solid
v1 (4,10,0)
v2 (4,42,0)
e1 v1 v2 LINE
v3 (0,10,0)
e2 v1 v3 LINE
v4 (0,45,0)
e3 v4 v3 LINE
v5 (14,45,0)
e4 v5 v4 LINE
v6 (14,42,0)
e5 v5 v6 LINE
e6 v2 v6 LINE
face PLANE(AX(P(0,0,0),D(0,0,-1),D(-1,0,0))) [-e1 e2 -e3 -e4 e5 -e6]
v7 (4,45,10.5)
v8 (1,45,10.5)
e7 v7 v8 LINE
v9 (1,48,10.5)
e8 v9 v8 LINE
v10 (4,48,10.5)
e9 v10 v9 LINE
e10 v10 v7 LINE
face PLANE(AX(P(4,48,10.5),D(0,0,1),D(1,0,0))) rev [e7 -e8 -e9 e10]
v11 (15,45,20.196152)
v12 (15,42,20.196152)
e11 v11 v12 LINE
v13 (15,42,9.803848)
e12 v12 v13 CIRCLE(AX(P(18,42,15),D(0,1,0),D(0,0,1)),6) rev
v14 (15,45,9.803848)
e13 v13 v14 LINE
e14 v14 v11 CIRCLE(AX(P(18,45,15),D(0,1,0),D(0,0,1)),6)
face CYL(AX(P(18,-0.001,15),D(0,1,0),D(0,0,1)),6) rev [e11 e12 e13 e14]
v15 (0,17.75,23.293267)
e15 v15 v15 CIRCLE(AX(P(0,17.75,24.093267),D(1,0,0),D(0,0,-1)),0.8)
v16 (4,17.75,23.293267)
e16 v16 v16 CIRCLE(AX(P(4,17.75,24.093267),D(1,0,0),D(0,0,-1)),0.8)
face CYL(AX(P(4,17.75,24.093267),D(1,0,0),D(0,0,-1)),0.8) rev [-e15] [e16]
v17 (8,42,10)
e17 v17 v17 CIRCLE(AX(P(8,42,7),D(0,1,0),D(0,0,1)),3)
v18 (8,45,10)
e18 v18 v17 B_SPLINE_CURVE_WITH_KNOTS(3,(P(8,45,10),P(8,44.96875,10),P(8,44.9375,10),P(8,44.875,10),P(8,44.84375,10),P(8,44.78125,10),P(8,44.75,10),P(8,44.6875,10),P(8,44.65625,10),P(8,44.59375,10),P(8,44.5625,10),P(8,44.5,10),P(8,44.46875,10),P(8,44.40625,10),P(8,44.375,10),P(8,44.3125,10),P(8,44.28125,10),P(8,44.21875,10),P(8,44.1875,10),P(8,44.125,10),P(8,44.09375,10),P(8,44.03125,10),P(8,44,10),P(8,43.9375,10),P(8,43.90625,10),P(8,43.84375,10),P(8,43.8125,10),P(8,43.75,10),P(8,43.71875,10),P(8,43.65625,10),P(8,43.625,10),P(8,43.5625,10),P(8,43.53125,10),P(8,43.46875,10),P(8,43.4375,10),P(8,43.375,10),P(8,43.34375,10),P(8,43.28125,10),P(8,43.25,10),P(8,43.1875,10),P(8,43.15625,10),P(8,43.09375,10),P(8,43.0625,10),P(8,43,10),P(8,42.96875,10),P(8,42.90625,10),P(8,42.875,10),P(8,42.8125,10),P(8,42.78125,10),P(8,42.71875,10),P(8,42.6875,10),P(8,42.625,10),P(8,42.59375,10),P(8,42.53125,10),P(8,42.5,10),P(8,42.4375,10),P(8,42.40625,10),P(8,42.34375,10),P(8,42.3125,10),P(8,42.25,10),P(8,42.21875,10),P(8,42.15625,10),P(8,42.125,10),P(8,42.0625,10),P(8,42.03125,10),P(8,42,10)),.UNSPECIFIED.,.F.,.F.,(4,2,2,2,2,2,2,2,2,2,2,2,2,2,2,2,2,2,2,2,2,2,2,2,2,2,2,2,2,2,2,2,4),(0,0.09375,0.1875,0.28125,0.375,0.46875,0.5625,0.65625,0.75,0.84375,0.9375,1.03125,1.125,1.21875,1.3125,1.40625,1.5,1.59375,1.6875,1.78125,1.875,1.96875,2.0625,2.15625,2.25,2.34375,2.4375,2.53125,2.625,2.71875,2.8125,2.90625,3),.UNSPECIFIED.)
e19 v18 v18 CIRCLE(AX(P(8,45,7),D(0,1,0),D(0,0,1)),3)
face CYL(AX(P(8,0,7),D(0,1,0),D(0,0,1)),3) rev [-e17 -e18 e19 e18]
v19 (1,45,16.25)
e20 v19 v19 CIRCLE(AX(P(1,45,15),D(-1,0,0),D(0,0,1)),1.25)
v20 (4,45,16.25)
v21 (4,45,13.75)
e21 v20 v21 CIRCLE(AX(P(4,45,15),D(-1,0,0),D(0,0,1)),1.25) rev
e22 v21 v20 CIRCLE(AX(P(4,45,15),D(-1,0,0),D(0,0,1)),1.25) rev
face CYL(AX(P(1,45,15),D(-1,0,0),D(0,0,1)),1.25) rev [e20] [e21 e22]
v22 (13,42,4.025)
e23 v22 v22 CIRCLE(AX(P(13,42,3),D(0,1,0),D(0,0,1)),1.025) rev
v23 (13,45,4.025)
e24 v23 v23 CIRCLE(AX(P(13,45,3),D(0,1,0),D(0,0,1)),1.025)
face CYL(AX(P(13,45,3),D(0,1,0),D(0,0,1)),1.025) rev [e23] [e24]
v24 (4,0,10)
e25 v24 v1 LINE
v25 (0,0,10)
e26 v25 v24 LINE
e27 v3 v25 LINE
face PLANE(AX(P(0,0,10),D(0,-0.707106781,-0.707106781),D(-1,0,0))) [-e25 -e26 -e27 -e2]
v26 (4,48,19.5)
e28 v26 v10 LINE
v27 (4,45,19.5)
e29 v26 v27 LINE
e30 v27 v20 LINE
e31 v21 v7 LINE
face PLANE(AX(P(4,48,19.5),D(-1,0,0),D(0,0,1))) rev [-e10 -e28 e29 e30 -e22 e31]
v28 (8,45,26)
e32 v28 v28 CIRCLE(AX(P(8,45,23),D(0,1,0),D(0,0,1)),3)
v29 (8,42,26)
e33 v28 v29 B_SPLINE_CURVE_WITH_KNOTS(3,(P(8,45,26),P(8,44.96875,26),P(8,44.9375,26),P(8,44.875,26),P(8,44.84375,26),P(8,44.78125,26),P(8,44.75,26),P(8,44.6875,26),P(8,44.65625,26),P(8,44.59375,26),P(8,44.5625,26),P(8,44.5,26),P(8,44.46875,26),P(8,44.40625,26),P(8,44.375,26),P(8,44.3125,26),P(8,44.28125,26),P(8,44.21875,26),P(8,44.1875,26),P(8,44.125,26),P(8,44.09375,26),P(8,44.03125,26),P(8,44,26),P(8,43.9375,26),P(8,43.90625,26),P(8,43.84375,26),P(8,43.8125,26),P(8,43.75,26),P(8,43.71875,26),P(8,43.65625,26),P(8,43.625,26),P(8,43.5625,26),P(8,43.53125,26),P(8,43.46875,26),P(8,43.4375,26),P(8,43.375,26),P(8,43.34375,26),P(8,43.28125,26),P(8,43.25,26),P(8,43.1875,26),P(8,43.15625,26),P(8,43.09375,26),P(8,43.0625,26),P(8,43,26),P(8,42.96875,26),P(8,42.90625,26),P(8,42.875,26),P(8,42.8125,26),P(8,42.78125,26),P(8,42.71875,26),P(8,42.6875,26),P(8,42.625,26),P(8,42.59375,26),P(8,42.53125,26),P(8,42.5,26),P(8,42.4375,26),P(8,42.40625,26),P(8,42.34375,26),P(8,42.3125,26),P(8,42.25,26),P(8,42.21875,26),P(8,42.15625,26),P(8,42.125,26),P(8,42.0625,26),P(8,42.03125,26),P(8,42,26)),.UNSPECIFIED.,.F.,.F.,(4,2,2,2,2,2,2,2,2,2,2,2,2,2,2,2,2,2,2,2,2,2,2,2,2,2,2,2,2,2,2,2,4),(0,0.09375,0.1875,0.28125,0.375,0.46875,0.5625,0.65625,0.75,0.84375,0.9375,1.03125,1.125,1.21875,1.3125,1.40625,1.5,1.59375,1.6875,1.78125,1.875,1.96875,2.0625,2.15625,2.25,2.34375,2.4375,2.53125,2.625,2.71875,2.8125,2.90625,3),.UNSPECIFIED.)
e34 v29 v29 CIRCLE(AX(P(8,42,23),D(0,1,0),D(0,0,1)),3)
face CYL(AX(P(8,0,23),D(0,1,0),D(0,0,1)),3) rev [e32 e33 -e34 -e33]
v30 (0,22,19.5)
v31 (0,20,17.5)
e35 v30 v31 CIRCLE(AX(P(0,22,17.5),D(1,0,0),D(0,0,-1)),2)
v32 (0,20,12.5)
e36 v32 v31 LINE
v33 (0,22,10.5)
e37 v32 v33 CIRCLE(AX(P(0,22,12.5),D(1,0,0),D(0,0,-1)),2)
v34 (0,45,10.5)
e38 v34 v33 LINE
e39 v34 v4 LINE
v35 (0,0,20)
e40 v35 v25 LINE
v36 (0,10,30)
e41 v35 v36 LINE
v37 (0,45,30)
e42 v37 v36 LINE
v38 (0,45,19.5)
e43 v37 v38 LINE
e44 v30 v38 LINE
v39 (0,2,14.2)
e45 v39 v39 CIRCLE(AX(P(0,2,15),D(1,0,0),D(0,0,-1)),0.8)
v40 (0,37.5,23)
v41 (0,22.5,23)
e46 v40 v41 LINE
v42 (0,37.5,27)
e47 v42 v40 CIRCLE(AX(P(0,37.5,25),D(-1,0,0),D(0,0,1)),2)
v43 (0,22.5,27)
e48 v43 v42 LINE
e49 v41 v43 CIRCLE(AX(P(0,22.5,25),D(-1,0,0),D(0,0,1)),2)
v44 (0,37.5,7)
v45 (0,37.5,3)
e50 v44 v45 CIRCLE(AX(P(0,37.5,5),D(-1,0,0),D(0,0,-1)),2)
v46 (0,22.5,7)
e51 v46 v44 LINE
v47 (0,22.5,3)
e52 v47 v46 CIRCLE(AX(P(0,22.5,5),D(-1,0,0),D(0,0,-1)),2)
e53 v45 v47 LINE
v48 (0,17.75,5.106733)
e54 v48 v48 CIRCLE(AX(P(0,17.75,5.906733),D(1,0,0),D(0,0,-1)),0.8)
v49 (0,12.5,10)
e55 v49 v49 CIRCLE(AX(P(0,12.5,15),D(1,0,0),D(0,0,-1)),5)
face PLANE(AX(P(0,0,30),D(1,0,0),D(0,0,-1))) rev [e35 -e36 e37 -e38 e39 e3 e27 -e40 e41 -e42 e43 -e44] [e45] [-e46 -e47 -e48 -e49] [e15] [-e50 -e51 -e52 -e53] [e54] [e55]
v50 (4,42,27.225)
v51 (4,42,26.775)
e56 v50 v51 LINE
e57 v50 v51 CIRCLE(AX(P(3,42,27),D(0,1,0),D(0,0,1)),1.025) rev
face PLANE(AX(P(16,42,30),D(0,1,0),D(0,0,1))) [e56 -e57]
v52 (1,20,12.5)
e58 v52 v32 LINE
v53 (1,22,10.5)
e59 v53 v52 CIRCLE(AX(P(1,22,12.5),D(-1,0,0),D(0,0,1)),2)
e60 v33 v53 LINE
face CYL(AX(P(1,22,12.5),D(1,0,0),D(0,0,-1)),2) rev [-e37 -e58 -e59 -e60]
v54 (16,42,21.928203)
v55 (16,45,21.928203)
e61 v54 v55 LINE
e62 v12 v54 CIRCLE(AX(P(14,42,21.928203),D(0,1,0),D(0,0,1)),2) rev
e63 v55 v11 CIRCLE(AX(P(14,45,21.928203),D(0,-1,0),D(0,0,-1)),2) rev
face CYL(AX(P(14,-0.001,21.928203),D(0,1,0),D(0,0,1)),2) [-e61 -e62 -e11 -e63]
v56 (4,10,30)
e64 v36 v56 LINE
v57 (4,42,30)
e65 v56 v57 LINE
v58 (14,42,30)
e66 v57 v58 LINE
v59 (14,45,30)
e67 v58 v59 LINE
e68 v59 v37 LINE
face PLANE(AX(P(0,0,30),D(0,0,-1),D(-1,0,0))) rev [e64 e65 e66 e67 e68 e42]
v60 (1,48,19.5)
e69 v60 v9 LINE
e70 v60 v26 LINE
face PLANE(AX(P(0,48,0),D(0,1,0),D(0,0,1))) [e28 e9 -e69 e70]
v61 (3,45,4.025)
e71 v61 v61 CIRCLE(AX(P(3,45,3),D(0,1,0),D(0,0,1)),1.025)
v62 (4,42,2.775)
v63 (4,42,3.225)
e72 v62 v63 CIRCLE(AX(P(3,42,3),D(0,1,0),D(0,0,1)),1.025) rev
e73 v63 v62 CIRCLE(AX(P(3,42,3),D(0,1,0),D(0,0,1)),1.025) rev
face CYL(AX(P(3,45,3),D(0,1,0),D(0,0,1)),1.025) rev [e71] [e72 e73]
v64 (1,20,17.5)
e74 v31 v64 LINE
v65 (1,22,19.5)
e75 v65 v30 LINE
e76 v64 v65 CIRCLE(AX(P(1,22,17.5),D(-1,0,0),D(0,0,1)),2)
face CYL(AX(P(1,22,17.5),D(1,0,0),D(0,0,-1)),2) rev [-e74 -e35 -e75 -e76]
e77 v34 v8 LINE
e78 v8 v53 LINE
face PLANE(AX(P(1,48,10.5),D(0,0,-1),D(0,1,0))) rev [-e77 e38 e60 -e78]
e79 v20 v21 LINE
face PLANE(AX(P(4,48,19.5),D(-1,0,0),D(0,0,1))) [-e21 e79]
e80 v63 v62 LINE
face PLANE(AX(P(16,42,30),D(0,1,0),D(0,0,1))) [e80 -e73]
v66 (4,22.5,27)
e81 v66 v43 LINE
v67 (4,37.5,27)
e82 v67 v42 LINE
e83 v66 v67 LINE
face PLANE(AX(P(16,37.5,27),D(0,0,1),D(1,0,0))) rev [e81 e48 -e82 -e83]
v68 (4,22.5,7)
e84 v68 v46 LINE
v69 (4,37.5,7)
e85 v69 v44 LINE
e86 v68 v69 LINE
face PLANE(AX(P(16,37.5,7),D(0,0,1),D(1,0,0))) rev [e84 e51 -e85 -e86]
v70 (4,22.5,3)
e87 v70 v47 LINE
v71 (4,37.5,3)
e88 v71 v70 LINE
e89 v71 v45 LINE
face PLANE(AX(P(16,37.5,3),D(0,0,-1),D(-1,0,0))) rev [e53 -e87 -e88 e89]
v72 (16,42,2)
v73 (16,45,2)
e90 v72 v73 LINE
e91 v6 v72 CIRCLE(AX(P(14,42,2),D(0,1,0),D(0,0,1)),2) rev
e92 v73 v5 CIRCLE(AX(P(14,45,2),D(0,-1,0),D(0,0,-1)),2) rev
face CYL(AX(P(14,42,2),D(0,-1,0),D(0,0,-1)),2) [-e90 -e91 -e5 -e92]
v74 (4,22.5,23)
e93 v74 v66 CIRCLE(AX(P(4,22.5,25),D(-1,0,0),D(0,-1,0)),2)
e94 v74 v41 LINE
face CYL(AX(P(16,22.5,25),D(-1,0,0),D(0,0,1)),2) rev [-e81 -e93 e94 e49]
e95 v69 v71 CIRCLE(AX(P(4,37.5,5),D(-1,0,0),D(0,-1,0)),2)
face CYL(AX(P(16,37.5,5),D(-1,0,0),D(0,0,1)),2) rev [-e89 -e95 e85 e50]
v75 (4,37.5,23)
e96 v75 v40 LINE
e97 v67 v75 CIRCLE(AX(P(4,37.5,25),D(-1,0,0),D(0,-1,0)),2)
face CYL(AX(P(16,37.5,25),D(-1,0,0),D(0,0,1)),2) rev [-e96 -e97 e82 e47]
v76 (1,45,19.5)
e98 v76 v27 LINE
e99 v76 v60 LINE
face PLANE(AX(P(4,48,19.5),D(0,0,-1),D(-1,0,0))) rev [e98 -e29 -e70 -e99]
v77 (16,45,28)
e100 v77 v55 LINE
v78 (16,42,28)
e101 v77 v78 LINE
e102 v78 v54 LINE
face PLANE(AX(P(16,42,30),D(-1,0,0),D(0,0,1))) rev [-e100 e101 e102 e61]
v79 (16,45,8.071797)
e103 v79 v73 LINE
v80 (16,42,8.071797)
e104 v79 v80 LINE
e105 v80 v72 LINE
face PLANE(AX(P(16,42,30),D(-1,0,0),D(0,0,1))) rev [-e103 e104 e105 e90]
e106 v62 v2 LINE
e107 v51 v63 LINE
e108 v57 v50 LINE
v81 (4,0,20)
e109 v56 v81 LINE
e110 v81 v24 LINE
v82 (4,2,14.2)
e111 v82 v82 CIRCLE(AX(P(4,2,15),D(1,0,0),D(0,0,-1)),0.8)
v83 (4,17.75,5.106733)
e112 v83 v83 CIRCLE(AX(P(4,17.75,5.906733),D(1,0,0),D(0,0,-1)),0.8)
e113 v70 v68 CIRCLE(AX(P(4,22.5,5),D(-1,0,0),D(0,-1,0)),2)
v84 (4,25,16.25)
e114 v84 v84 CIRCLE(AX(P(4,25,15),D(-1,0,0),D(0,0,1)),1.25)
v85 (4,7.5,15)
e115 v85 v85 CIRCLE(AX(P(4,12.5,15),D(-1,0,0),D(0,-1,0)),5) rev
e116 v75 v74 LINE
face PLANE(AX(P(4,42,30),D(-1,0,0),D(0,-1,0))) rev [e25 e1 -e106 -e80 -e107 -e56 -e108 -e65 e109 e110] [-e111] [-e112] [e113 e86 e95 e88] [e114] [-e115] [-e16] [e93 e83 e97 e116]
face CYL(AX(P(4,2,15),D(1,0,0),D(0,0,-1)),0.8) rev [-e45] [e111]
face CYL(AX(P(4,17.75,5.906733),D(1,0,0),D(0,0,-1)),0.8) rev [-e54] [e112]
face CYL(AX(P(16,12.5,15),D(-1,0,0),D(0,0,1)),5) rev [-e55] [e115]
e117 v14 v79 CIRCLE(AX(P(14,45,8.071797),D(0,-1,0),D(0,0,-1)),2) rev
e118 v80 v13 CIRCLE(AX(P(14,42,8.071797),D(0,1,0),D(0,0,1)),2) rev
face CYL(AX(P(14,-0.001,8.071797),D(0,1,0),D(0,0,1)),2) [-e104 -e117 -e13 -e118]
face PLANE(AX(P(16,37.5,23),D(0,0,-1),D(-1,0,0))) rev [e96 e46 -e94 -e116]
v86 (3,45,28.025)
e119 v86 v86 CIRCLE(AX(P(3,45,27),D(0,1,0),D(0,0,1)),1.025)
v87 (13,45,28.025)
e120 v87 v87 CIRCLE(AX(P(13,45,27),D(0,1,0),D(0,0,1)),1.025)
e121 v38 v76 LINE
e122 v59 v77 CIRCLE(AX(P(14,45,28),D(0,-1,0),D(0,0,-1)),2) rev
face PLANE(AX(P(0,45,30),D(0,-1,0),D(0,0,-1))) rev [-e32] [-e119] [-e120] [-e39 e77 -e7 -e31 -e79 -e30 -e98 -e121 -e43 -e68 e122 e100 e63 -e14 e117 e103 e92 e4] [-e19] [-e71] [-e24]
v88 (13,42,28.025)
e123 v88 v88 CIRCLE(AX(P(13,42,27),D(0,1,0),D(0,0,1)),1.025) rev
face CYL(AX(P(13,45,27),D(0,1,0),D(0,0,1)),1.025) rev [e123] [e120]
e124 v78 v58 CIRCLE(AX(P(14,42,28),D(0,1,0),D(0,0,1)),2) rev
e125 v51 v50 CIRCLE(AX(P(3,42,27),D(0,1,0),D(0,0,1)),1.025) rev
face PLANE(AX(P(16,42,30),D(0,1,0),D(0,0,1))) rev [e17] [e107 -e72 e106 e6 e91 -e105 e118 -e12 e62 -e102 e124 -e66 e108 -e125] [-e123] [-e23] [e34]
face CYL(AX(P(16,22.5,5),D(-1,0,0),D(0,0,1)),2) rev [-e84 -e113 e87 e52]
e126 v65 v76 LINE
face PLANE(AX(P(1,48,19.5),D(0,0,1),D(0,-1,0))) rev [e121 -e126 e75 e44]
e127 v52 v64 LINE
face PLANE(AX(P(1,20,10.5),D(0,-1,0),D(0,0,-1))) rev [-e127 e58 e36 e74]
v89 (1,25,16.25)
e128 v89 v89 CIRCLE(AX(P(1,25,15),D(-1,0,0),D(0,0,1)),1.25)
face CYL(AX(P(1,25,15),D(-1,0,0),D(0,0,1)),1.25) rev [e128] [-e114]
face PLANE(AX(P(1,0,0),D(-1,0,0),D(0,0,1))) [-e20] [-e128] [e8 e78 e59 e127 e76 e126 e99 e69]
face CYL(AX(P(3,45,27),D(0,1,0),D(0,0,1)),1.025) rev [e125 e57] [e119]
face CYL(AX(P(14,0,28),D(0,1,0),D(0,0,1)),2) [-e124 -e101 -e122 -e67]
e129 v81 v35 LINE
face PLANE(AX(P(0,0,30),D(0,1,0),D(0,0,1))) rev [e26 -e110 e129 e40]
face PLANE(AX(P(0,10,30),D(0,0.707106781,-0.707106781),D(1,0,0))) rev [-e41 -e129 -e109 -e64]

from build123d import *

# Parameters (mm, degrees)
EXTRUDE_1_DEPTH              = 30
SKETCH_3_R                   = 5
CUT_EXTRUDE_1_DEPTH          = 57.400354609
SKETCH_6_R                   = 3
CUT_EXTRUDE_3_DEPTH          = 57.400354609
SKETCH_9_W                   = 4
SKETCH_9_H                   = 9
EXTRUDE_3_DEPTH              = 3
SKETCH_10_W                  = 9
SKETCH_10_H                  = 28
CUT_EXTRUDE_4_DEPTH          = 1
HOLE_START                   = 1
HOLE_WIZARD_M3_1_OUTLINE_R   = 1.25
HOLE_WIZARD_M3_1_DEPTH       = 3
CUT_EXTRUDE_5_DEPTH          = 59.821764679
CHAMFER_1_SIZE               = 10
HOLE_START_2                 = 42
HOLE_WIZARD_M2_5_3_OUTLINE_R = 1.025
HOLE_WIZARD_M2_5_3_DEPTH     = 3
CUT_EXTRUDE_6_REACH          = 58.4
SKETCH_18_R                  = 6
FILLET_2_R                   = 2
FILLET_3_R                   = 2
HOLE_WIZARD_M2_1_D           = 1.6


# Read off the part's stored shape, not the designer's step: M3 螺纹孔1, M2.5 螺纹孔3
with BuildPart() as part:
    # 草图2 → 凸台-拉伸1 (new body)
    with BuildSketch(Plane.XY):
        Polygon((16, 42), (4, 42), (4, 0), (0, 0), (0, 45), (16, 45), align=None)
    extrude(amount=EXTRUDE_1_DEPTH)

    # 草图3 → 切除-拉伸1 (cut, through all)
    with BuildSketch(Plane(origin=(0, 0, 30), x_dir=(0, 0, -1), z_dir=(1, 0, 0))):
        with Locations(Location((15, 12.5, 0), (0, 0, 270))):
            Circle(SKETCH_3_R)
    extrude(amount=CUT_EXTRUDE_1_DEPTH, mode=Mode.SUBTRACT)

    # 草图6 → 切除-拉伸3 (cut, through all)
    with BuildSketch(Plane(origin=(0, 45, 0), x_dir=(1, 0, 0), z_dir=(0, 1, 0))):
        with Locations(Location((8, -23, 0), (0, 0, 270))):
            Circle(SKETCH_6_R)
        with Locations(Location((8, -7, 0), (0, 0, 270))):
            Circle(SKETCH_6_R)
    extrude(amount=-CUT_EXTRUDE_3_DEPTH, mode=Mode.SUBTRACT)

    # 草图9 → 凸台-拉伸3 (add)
    with BuildSketch(Plane(origin=(0, 45, 0), x_dir=(1, 0, 0), z_dir=(0, 1, 0))):
        with Locations((2, -15)):
            Rectangle(SKETCH_9_W, SKETCH_9_H)
    extrude(amount=EXTRUDE_3_DEPTH)

    # 草图10 → 切除-拉伸4 (cut)
    with BuildSketch(Plane.ZY):
        with Locations((15, 34)):
            Rectangle(SKETCH_10_W, SKETCH_10_H)
    extrude(amount=-CUT_EXTRUDE_4_DEPTH, mode=Mode.SUBTRACT)

    # M3 螺纹孔1 outline → M3 螺纹孔1 (cut)
    with BuildSketch(Plane.YZ.offset(HOLE_START)):
        with Locations((25, 15)):
            Circle(HOLE_WIZARD_M3_1_OUTLINE_R)
        with Locations((45, 15)):
            Circle(HOLE_WIZARD_M3_1_OUTLINE_R)
    extrude(amount=HOLE_WIZARD_M3_1_DEPTH, mode=Mode.SUBTRACT)

    # 草图13 → 切除-拉伸5 (cut, through all)
    with BuildSketch(Plane.ZY):
        with BuildLine():
            Line((27, 37.5), (27, 22.5))
            ThreePointArc((27, 22.5), (25, 20.5), (23, 22.5))
            Line((23, 22.5), (23, 37.5))
            ThreePointArc((23, 37.5), (25, 39.5), (27, 37.5))
        make_face()
        with BuildLine():
            Line((3, 37.5), (3, 22.5))
            ThreePointArc((3, 22.5), (5, 20.5), (7, 22.5))
            Line((7, 22.5), (7, 37.5))
            ThreePointArc((7, 37.5), (5, 39.5), (3, 37.5))
        make_face()
    extrude(amount=-CUT_EXTRUDE_5_DEPTH, mode=Mode.SUBTRACT)

    # 倒角1
    chamfer_1_edges = [part.edges().sort_by_distance(p)[0] for p in [
        (2, 0, 30),
        (2, 0, 0),
    ]]
    chamfer(chamfer_1_edges, length=CHAMFER_1_SIZE)

    # M2.5 螺纹孔3 outline → M2.5 螺纹孔3 (cut)
    with BuildSketch(Plane(origin=(0, 0, 0), x_dir=(1, 0, 0), z_dir=(0, 1, 0)).offset(HOLE_START_2)):
        with Locations((3, -27)):
            Circle(HOLE_WIZARD_M2_5_3_OUTLINE_R)
        with Locations((13, -27)):
            Circle(HOLE_WIZARD_M2_5_3_OUTLINE_R)
        with Locations((13, -3)):
            Circle(HOLE_WIZARD_M2_5_3_OUTLINE_R)
        with Locations((3, -3)):
            Circle(HOLE_WIZARD_M2_5_3_OUTLINE_R)
    extrude(amount=HOLE_WIZARD_M2_5_3_DEPTH, mode=Mode.SUBTRACT)

    # 草图18 → 切除-拉伸6 (cut, up to next)
    with BuildSketch(Plane(origin=(0, 45, 0), x_dir=(1, 0, 0), z_dir=(0, 1, 0)), mode=Mode.PRIVATE) as cut_extrude_6_sk1:
        with Locations((18, -15)):
            Circle(SKETCH_18_R)
    cut_extrude_6_tool1 = extrude(cut_extrude_6_sk1.sketch, amount=-CUT_EXTRUDE_6_REACH, mode=Mode.PRIVATE) & part.part
    add(cut_extrude_6_tool1.solids().sort_by_distance((18, 45, 15))[0], mode=Mode.SUBTRACT)

    # 圆角2
    fillet_2_edges = [part.edges().sort_by_distance(p)[0] for p in [
        (16, 43.5, 30),
        (16, 43.5, 20.656854249),
        (16, 43.5, 9.343145751),
        (16, 43.5, 0),
    ]]
    fillet(fillet_2_edges, radius=FILLET_2_R)

    # 圆角3
    fillet_3_edges = [part.edges().sort_by_distance(p)[0] for p in [
        (0.5, 20, 10.5),
        (0.5, 20, 19.5),
    ]]
    fillet(fillet_3_edges, radius=FILLET_3_R)

    # M2 螺纹孔1 (through all)
    with Locations(Plane(origin=(4, 17.75, 24.09326674), x_dir=(0, 1, 0), z_dir=(1, 0, 0))):
        with Locations((0, 0), (0, -18.18653348), (-15.75, -9.09326674)):
            Hole(HOLE_WIZARD_M2_1_D / 2)


solid = part.part
